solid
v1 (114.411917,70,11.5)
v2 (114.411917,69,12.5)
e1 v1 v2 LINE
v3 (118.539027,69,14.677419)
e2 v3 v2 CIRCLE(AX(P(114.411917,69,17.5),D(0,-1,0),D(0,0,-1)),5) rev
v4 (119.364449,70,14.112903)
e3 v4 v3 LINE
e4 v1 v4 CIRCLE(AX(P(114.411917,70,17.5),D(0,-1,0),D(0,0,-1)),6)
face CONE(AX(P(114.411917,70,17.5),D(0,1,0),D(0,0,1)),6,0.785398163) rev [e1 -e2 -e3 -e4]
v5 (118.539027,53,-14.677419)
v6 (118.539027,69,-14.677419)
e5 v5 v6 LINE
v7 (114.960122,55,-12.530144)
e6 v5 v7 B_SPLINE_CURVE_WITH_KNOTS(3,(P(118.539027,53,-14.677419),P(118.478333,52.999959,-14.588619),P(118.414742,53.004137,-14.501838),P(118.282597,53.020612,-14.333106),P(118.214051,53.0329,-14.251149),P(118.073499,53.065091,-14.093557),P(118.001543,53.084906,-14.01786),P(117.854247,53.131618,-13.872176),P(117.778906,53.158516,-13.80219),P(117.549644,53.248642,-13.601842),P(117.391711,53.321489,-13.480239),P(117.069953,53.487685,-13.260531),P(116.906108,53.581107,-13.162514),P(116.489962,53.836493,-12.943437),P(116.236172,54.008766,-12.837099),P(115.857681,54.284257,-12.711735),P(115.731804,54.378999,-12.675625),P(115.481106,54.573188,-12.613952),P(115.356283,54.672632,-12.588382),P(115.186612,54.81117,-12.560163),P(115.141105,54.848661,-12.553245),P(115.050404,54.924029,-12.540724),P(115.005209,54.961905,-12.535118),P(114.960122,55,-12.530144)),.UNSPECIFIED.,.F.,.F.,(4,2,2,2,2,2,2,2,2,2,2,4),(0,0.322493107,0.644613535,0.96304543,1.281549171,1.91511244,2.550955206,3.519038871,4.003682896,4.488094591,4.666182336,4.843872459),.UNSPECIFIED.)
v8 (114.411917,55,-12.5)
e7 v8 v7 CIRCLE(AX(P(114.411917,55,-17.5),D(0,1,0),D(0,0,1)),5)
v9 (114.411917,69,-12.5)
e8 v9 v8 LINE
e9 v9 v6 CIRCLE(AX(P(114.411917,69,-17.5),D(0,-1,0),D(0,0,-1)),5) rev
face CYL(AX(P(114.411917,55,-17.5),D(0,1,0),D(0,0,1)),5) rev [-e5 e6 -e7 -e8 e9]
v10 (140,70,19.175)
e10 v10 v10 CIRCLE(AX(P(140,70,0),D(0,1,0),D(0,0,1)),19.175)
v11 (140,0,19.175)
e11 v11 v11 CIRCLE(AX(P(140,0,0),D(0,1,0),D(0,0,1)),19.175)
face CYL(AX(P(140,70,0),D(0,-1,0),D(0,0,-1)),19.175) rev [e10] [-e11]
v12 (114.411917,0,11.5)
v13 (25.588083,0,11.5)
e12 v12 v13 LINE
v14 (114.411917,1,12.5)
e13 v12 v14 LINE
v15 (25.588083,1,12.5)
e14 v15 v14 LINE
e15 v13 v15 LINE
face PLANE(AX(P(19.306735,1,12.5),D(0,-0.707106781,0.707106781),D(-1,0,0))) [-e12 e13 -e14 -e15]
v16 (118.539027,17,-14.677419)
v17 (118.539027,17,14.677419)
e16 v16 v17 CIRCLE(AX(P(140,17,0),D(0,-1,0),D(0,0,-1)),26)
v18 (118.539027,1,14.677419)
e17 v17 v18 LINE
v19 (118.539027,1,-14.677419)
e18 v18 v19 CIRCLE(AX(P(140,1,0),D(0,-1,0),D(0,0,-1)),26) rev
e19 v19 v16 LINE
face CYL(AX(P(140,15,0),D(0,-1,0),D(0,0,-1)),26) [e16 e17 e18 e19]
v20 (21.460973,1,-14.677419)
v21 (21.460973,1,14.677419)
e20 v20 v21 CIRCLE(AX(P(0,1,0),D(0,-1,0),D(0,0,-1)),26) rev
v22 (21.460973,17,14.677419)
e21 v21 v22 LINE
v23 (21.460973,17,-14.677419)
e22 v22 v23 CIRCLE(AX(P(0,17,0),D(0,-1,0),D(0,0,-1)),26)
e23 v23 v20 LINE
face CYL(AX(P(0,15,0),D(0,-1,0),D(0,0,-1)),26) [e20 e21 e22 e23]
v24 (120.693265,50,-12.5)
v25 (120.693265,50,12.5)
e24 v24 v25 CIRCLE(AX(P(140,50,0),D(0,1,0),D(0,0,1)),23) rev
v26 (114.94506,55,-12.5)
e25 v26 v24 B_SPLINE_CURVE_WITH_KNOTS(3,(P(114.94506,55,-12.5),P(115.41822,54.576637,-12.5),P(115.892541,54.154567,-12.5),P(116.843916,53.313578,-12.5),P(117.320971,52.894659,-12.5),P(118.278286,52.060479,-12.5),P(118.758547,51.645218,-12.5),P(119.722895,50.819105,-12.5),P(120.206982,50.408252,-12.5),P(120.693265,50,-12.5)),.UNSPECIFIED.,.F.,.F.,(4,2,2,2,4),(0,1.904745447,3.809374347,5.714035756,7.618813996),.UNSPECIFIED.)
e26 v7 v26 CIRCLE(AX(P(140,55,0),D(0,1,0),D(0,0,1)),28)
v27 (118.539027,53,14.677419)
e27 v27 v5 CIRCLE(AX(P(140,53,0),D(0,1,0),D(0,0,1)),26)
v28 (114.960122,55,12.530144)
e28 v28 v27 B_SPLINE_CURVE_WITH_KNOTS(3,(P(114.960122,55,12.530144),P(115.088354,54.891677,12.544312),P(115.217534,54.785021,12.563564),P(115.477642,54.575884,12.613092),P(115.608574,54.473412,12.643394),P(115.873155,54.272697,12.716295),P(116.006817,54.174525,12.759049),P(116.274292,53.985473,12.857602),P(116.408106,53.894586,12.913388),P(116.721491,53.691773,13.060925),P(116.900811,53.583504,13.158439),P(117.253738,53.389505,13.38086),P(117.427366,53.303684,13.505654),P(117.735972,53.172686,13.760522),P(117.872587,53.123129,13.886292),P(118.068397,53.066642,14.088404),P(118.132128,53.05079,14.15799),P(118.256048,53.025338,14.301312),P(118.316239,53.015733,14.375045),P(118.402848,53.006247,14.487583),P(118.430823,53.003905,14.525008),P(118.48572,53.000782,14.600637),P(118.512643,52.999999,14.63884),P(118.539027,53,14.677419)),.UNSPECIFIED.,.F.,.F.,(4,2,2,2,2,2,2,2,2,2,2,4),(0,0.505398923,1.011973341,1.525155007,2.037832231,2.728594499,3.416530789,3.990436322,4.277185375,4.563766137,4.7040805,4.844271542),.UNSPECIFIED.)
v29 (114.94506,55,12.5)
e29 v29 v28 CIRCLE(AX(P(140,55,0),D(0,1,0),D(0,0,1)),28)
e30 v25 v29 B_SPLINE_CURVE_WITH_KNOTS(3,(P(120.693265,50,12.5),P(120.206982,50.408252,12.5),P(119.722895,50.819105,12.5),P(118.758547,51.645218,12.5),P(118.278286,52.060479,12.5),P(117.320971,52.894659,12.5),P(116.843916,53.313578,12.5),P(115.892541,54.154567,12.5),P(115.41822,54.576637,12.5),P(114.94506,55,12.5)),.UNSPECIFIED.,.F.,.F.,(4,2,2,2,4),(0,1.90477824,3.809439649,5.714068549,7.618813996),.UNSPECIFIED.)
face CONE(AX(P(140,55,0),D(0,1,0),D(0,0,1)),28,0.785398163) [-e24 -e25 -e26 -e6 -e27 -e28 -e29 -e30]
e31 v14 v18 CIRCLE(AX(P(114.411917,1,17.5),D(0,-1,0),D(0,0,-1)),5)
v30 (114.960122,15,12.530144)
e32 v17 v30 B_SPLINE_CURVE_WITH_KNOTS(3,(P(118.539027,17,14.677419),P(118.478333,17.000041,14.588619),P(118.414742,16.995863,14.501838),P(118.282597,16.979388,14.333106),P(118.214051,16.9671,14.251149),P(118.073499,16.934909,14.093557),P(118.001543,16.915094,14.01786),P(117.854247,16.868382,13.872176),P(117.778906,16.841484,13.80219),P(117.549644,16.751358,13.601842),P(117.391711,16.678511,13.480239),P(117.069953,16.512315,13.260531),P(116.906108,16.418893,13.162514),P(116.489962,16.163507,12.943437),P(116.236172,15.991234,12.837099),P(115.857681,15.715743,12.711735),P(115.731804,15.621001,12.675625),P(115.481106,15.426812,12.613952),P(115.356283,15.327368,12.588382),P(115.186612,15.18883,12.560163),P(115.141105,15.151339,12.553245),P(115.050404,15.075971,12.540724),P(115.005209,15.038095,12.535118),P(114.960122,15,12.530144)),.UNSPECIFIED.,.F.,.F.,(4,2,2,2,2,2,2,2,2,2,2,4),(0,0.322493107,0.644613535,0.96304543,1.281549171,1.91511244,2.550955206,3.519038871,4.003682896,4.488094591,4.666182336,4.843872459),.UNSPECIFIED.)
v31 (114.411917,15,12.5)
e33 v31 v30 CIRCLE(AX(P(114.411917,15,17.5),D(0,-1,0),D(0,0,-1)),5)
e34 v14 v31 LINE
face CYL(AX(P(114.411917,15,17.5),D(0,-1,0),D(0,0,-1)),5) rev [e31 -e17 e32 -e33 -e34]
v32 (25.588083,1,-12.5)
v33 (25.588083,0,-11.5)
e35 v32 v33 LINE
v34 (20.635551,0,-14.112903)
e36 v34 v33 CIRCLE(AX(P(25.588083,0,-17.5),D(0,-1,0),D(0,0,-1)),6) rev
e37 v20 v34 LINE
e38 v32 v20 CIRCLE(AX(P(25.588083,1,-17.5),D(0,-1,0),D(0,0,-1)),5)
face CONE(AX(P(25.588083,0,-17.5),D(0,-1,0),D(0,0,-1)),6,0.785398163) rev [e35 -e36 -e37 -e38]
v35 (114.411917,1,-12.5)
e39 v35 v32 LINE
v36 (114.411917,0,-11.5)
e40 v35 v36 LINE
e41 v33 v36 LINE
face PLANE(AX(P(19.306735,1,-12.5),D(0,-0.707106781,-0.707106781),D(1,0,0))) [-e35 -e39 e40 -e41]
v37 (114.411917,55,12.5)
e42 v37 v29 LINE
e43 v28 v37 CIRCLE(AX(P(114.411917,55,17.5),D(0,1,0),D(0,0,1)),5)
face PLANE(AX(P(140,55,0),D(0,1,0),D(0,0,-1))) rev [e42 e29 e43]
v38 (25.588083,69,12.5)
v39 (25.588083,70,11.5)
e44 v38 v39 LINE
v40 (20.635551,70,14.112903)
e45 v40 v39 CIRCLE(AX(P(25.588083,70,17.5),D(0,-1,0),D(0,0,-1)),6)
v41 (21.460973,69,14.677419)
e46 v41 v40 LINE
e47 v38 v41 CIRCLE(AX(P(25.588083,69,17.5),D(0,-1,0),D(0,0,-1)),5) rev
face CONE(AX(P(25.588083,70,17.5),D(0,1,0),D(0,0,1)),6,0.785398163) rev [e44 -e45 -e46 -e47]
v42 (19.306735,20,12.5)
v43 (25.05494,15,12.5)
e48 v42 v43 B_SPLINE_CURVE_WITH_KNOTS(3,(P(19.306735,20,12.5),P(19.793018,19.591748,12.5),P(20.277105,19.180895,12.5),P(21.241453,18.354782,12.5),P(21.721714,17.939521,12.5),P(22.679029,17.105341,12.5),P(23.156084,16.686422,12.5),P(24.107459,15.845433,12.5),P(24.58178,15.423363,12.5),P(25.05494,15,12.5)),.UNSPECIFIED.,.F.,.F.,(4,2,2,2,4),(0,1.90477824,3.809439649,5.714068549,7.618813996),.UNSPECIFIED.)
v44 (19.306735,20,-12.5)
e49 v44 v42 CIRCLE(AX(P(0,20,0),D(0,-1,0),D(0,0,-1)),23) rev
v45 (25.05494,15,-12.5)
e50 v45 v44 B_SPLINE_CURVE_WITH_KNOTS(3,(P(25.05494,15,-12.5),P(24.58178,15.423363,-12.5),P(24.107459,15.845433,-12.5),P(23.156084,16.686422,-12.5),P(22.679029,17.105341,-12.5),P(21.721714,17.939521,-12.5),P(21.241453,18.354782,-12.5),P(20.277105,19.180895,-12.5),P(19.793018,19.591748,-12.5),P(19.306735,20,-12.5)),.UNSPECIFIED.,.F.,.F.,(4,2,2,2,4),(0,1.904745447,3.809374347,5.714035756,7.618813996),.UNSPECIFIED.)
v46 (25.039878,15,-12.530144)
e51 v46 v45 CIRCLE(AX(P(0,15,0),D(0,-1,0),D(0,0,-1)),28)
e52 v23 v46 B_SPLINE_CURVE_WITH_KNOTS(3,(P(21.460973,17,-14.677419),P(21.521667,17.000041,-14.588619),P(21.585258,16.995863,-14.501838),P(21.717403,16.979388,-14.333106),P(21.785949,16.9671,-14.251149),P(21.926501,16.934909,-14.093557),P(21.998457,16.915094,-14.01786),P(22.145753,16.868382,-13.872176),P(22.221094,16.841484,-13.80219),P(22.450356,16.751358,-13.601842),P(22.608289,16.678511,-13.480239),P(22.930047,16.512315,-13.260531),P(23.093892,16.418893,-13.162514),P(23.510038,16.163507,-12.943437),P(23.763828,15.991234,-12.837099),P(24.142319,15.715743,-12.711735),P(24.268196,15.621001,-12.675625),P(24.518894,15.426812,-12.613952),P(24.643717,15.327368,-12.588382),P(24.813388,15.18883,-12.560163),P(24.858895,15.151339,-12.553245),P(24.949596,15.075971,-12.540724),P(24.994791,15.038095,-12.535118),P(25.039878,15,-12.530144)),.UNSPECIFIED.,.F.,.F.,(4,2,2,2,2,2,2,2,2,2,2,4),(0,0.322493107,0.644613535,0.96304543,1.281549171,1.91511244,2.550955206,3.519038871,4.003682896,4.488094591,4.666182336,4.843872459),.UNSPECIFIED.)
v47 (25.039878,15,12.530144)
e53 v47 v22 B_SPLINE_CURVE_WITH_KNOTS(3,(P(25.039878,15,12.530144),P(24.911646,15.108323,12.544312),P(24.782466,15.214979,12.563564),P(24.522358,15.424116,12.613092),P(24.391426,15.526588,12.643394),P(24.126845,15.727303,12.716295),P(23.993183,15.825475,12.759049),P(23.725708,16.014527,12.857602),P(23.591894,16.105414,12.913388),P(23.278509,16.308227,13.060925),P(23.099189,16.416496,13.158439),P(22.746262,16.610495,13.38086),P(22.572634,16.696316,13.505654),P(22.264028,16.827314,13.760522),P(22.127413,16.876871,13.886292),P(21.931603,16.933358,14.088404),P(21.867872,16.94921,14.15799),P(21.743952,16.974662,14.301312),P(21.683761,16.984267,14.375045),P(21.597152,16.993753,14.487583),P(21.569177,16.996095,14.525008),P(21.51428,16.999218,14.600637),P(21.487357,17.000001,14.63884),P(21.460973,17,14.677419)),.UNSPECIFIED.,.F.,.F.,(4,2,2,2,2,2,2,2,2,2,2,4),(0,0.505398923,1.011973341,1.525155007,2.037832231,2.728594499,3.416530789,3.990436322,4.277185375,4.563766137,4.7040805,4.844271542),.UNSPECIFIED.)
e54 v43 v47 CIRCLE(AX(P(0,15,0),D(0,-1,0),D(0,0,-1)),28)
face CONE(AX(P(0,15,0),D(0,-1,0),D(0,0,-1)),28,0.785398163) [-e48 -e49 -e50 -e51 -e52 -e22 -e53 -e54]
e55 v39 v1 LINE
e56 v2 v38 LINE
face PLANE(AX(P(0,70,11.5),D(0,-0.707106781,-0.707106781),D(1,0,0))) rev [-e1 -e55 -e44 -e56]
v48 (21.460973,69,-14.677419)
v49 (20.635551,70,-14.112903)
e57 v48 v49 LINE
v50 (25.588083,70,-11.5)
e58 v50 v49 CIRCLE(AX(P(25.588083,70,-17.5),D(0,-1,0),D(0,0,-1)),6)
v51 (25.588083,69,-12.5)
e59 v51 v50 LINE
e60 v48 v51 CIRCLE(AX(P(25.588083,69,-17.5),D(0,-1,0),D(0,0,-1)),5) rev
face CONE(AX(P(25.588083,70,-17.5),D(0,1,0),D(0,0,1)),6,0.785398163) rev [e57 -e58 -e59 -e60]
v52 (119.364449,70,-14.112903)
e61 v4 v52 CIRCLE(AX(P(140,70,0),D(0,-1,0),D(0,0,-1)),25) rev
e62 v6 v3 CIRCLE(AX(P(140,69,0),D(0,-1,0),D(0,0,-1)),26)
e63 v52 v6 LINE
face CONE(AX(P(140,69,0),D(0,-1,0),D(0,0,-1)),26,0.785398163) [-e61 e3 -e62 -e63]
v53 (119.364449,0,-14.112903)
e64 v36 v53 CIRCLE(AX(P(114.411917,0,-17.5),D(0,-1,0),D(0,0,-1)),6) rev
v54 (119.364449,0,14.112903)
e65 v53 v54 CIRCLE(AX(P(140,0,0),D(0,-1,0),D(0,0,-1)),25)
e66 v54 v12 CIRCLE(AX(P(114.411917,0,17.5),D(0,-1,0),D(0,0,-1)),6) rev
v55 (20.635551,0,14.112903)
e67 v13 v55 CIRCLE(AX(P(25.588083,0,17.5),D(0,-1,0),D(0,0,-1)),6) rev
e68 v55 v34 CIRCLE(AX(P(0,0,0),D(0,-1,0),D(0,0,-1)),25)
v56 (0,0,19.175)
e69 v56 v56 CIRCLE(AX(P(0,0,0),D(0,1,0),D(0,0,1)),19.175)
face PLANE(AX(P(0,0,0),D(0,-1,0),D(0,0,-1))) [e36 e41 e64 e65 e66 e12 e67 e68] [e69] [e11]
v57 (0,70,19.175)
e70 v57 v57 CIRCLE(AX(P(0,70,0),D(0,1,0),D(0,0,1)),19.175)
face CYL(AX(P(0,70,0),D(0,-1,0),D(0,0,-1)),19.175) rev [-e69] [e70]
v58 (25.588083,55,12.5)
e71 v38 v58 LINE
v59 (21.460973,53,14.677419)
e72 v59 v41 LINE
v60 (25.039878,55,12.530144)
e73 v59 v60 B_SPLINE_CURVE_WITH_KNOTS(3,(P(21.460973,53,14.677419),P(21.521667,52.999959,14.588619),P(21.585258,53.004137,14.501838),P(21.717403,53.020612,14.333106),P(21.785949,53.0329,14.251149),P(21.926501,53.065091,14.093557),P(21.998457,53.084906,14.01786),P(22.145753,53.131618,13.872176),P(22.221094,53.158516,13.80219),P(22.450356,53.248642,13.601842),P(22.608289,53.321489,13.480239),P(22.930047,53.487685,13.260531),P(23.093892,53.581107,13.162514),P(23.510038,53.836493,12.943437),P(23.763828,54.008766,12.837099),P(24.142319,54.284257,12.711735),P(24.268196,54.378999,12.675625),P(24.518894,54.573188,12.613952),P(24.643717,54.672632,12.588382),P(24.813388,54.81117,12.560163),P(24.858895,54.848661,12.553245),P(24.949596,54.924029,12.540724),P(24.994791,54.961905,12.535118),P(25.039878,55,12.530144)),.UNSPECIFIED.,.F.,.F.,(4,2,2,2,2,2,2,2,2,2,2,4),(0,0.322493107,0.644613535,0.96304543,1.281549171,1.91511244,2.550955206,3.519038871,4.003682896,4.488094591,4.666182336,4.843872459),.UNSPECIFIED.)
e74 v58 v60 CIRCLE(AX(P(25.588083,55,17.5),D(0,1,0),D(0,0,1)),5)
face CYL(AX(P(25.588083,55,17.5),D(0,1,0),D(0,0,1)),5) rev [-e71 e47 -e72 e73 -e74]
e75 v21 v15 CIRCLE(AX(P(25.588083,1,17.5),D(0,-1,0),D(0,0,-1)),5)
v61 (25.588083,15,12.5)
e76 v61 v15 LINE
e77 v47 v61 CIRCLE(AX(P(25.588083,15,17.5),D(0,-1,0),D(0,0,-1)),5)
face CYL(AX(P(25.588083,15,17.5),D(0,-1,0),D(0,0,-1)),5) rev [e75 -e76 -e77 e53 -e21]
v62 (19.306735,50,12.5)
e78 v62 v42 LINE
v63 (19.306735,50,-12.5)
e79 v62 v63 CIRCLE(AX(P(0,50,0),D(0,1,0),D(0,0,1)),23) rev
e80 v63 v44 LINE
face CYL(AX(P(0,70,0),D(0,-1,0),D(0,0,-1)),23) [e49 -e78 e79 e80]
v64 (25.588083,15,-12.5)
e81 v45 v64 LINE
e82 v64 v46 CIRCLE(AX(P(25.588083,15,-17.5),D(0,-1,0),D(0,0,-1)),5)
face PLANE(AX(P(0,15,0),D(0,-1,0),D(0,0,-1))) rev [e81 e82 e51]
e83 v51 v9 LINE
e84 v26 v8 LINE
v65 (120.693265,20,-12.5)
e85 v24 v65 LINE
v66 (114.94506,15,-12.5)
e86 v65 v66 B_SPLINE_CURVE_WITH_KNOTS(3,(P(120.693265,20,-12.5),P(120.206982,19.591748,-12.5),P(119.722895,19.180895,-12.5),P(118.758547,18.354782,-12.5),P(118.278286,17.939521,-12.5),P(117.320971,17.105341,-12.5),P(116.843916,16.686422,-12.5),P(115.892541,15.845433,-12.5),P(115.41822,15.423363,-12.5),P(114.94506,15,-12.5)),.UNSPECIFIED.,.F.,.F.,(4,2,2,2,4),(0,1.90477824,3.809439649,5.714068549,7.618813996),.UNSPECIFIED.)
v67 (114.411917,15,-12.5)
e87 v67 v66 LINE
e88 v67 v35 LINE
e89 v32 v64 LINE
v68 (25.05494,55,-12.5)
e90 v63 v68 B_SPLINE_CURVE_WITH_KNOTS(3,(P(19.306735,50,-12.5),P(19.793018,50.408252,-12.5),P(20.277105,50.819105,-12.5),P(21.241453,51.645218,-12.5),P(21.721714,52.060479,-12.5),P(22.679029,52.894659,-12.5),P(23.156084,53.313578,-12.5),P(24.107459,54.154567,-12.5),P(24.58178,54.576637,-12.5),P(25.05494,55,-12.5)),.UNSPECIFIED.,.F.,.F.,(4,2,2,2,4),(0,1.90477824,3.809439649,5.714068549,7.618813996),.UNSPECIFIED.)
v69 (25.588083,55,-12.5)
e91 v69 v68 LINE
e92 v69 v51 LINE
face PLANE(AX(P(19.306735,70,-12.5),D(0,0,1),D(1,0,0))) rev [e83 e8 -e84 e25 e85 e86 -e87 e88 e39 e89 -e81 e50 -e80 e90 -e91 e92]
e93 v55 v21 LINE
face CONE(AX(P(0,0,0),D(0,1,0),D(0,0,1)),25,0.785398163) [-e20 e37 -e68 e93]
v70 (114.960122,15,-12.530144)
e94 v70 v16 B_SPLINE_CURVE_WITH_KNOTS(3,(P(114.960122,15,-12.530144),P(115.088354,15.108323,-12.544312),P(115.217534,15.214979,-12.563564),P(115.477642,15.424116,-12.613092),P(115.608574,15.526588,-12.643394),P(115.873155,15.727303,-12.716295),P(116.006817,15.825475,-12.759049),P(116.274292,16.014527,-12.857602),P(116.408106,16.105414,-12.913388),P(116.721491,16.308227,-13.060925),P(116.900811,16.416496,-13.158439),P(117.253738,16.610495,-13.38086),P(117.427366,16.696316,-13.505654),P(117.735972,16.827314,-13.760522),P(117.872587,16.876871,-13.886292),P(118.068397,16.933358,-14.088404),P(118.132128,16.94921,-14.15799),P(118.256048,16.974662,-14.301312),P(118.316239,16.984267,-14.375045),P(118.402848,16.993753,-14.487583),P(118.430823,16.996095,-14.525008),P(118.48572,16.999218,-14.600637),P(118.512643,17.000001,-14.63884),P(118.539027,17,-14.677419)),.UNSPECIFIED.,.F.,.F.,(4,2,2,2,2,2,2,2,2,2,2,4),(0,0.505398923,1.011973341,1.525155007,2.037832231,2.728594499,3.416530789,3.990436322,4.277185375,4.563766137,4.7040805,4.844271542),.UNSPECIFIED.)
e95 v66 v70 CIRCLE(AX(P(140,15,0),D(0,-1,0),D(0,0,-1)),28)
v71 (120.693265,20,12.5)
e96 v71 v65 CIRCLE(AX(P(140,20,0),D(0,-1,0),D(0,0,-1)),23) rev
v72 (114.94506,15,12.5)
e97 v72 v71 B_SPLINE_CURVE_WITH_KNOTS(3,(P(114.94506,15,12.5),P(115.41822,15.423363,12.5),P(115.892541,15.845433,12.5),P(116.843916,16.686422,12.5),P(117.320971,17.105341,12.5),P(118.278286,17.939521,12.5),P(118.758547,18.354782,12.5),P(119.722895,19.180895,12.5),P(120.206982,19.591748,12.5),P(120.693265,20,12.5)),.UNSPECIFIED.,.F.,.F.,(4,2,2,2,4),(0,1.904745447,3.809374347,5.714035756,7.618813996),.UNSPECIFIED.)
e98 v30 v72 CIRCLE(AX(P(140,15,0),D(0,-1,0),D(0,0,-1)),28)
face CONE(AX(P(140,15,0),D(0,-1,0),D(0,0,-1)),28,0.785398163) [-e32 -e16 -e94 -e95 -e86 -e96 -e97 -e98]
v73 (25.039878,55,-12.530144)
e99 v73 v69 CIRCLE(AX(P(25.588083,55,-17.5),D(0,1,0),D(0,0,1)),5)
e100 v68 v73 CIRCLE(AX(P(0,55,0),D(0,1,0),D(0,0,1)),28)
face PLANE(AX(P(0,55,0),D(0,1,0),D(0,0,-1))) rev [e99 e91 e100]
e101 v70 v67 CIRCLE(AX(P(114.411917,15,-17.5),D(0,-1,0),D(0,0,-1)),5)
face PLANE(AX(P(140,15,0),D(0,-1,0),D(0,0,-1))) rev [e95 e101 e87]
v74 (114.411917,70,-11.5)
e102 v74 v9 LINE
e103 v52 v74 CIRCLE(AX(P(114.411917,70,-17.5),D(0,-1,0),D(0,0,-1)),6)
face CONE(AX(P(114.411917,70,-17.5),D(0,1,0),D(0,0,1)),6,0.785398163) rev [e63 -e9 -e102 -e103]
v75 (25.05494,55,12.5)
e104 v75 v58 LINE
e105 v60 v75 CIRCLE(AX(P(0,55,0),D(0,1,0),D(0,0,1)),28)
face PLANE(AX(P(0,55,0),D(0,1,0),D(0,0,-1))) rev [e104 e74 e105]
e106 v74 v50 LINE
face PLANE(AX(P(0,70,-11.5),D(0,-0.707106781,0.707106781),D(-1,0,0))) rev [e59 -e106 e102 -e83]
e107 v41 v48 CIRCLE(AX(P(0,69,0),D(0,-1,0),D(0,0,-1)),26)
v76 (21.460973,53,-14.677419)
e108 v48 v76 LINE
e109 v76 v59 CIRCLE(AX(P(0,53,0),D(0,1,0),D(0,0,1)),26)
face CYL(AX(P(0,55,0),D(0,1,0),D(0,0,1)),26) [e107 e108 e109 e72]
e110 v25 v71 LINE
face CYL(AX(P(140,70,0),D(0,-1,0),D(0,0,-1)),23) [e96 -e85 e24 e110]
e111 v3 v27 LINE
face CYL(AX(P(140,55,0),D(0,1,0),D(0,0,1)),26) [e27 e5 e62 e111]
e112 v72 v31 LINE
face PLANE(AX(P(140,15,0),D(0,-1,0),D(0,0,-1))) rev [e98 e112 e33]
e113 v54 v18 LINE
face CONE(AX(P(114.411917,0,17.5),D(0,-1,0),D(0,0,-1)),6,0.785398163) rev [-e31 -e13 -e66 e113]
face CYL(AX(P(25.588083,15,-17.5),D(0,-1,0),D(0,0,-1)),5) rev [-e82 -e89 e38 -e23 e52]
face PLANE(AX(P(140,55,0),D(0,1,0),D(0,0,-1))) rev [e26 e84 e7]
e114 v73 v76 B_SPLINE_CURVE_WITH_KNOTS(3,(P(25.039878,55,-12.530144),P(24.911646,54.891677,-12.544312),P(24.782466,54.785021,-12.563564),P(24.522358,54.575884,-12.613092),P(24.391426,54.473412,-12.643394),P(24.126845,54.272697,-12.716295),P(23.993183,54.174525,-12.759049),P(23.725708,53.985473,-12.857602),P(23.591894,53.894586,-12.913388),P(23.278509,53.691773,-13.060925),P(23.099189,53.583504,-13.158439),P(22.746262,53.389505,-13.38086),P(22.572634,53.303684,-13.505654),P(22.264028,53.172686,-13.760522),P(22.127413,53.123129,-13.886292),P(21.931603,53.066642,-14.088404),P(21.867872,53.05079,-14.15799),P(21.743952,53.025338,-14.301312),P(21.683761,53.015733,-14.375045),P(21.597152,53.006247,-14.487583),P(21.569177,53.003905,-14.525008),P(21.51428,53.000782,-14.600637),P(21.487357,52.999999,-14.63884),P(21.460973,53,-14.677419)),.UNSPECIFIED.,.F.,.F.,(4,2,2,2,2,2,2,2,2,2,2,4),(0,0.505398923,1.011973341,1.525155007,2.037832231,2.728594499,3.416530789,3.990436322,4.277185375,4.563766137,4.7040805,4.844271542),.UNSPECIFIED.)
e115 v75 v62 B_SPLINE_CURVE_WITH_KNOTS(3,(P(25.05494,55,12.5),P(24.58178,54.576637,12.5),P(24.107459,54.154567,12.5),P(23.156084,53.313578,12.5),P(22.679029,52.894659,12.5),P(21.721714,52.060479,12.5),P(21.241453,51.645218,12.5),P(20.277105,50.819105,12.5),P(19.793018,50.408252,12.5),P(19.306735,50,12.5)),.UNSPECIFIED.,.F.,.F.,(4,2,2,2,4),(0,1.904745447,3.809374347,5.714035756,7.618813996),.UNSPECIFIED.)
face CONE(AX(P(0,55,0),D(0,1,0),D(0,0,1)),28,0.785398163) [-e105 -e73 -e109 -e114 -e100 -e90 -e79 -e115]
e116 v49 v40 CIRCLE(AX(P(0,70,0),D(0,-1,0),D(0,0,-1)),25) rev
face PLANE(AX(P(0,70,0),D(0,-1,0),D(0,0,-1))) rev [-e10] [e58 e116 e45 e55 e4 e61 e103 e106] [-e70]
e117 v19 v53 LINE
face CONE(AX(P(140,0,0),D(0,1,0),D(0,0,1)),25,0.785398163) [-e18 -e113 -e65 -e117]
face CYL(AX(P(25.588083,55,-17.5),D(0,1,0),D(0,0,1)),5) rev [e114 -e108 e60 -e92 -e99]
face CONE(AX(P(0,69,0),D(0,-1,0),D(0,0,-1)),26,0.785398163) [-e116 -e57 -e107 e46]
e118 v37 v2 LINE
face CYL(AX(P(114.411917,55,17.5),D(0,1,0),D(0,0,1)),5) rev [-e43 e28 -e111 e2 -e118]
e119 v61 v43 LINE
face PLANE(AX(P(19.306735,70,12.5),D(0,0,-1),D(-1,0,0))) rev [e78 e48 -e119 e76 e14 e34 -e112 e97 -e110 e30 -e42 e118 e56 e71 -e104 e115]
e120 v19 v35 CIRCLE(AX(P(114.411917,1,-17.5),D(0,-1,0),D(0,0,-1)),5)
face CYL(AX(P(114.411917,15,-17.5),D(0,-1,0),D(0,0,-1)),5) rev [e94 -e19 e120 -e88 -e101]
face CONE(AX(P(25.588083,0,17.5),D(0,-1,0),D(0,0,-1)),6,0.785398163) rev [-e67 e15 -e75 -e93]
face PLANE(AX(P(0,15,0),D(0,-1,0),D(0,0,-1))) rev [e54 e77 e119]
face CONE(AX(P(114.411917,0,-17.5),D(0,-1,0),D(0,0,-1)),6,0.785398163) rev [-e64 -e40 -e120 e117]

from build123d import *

# Parameters (mm, degrees)
SKETCH1_R            = 19.175
BOSS_EXTRUDE1_DEPTH  = 70
SKETCH3_R            = 26
SKETCH3_R_2          = 19.175
BOSS_EXTRUDE2_DEPTH  = 15
FILLET1_R            = 5
CHAMFER2_START       = 15
CHAMFER2_3_OUTLINE_W = 198
CHAMFER2_3_OUTLINE_H = 58
CHAMFER2_3_DEPTH     = 5
CHAMFER1_SIZE        = 1


with BuildPart() as part:
    # Sketch1 → Boss-Extrude1 (new body)
    with BuildSketch(Plane(origin=(0, 0, 0), x_dir=(1, 0, 0), z_dir=(0, 1, 0))):
        with BuildLine():
            Line((19.306734576, -12.5), (120.693265424, -12.5))
            ThreePointArc((120.693265424, -12.5), (129.011369512, -20.205197351), (140, -23))
            ThreePointArc((140, -23), (163, 0), (140, 23))
            ThreePointArc((140, 23), (129.011369512, 20.205197351), (120.693265424, 12.5))
            Line((120.693265424, 12.5), (19.306734576, 12.5))
            ThreePointArc((19.306734576, 12.5), (10.988630488, 20.205197351), (0, 23))
            ThreePointArc((0, 23), (-23, 0), (0, -23))
            ThreePointArc((0, -23), (10.988630488, -20.205197351), (19.306734576, -12.5))
        make_face()
        with Locations(Location((0, 0, 0), (0, 0, 270))):
            Circle(SKETCH1_R, mode=Mode.SUBTRACT)
        with Locations(Location((140, 0, 0), (0, 0, 270))):
            Circle(SKETCH1_R, mode=Mode.SUBTRACT)
    extrude(amount=BOSS_EXTRUDE1_DEPTH)

    # Sketch3 → Boss-Extrude2 (add)
    # profile 1 of 2: a face of its own
    with BuildSketch(Plane.XZ):
        Circle(SKETCH3_R)
        with Locations(Location((0, 0, 0), (0, 0, 90))):
            Circle(SKETCH3_R_2, mode=Mode.SUBTRACT)
    # profile 2 of 2: a face of its own
    with BuildSketch(Plane.XZ):
        with Locations((140, 0)):
            Circle(SKETCH3_R)
        with Locations(Location((140, 0, 0), (0, 0, 90))):
            Circle(SKETCH3_R_2, mode=Mode.SUBTRACT)
    extrude(amount=-BOSS_EXTRUDE2_DEPTH)

    # Fillet1
    fillet1_edges = [part.edges().sort_by_distance(p)[0] for p in [
        (22.79802623, 7.5, -12.5),
        (22.79802623, 7.5, 12.5),
        (117.20197377, 7.5, -12.5),
        (117.20197377, 7.5, 12.5),
    ]]
    fillet(fillet1_edges, radius=FILLET1_R)

    # Chamfer2: read off the stored shape, not the designer's step
    # Chamfer2 outline → Chamfer2 (revolve)
    with BuildSketch(Plane.XY):
        Polygon((28, 15), (23, 20), (23, 15), align=None)
    revolve(axis=Axis((0, 0, 0), (0, 1, 0)))

    # Chamfer2 2 outline → Chamfer2 2 (revolve)
    with BuildSketch(Plane(origin=(140, 0, 0), x_dir=(1, 0, 0), z_dir=(0, 0, 1))):
        Polygon((28, 15), (23, 20), (23, 15), align=None)
    revolve(axis=Axis((140, 0, 0), (0, 1, 0)))

    # Chamfer2 3 outline → Chamfer2 3 (cut)
    with BuildSketch(Plane(origin=(0, 0, 0), x_dir=(1, 0, 0), z_dir=(0, 1, 0)).offset(CHAMFER2_START)):
        with Locations((70, 0)):
            Rectangle(CHAMFER2_3_OUTLINE_W, CHAMFER2_3_OUTLINE_H)
        with BuildLine():
            ThreePointArc((25.588083164, -12.5), (23.254941851, -13.0777323), (21.460972976, -14.677419355))
            ThreePointArc((21.460972976, -14.677419355), (-26, 0), (21.460972976, 14.677419355))
            ThreePointArc((21.460972976, 14.677419355), (23.254941851, 13.0777323), (25.588083164, 12.5))
            Line((25.588083164, 12.5), (114.411916836, 12.5))
            ThreePointArc((114.411916836, 12.5), (116.745058149, 13.0777323), (118.539027024, 14.677419355))
            ThreePointArc((118.539027024, 14.677419355), (166, 0), (118.539027024, -14.677419355))
            ThreePointArc((118.539027024, -14.677419355), (116.745058149, -13.0777323), (114.411916836, -12.5))
            Line((114.411916836, -12.5), (25.588083164, -12.5))
        make_face(mode=Mode.SUBTRACT)
    extrude(amount=CHAMFER2_3_DEPTH, mode=Mode.SUBTRACT)

    # Mirror1: read off the stored shape, not the designer's step
    # Mirror1: part across plane


with BuildPart() as part_1:
    add(part.part)
    add(part.part.mirror(Plane(origin=(0, 35, 0), x_dir=(0, 0, 1), z_dir=(0, -1, 0))))

    # Chamfer1
    chamfer1_edges = [part_1.edges().sort_by_distance(p)[0] for p in [
        (166, 70, 0),
        (70, 70, -12.5),
        (70, 70, 12.5),
        (-26, 70, 0),
        (116.745058149, 70, -13.0777323),
        (116.745058149, 70, 13.0777323),
        (23.254941851, 70, -13.0777323),
        (23.254941851, 70, 13.0777323),
        (70, 0, -12.5),
        (166, 0, 0),
        (70, 0, 12.5),
        (-26, 0, 0),
        (116.745058149, 0, -13.0777323),
        (116.745058149, 0, 13.0777323),
        (23.254941851, 0, -13.0777323),
        (23.254941851, 0, 13.0777323),
    ]]
    chamfer(chamfer1_edges, length=CHAMFER1_SIZE)


solid = part_1.part
